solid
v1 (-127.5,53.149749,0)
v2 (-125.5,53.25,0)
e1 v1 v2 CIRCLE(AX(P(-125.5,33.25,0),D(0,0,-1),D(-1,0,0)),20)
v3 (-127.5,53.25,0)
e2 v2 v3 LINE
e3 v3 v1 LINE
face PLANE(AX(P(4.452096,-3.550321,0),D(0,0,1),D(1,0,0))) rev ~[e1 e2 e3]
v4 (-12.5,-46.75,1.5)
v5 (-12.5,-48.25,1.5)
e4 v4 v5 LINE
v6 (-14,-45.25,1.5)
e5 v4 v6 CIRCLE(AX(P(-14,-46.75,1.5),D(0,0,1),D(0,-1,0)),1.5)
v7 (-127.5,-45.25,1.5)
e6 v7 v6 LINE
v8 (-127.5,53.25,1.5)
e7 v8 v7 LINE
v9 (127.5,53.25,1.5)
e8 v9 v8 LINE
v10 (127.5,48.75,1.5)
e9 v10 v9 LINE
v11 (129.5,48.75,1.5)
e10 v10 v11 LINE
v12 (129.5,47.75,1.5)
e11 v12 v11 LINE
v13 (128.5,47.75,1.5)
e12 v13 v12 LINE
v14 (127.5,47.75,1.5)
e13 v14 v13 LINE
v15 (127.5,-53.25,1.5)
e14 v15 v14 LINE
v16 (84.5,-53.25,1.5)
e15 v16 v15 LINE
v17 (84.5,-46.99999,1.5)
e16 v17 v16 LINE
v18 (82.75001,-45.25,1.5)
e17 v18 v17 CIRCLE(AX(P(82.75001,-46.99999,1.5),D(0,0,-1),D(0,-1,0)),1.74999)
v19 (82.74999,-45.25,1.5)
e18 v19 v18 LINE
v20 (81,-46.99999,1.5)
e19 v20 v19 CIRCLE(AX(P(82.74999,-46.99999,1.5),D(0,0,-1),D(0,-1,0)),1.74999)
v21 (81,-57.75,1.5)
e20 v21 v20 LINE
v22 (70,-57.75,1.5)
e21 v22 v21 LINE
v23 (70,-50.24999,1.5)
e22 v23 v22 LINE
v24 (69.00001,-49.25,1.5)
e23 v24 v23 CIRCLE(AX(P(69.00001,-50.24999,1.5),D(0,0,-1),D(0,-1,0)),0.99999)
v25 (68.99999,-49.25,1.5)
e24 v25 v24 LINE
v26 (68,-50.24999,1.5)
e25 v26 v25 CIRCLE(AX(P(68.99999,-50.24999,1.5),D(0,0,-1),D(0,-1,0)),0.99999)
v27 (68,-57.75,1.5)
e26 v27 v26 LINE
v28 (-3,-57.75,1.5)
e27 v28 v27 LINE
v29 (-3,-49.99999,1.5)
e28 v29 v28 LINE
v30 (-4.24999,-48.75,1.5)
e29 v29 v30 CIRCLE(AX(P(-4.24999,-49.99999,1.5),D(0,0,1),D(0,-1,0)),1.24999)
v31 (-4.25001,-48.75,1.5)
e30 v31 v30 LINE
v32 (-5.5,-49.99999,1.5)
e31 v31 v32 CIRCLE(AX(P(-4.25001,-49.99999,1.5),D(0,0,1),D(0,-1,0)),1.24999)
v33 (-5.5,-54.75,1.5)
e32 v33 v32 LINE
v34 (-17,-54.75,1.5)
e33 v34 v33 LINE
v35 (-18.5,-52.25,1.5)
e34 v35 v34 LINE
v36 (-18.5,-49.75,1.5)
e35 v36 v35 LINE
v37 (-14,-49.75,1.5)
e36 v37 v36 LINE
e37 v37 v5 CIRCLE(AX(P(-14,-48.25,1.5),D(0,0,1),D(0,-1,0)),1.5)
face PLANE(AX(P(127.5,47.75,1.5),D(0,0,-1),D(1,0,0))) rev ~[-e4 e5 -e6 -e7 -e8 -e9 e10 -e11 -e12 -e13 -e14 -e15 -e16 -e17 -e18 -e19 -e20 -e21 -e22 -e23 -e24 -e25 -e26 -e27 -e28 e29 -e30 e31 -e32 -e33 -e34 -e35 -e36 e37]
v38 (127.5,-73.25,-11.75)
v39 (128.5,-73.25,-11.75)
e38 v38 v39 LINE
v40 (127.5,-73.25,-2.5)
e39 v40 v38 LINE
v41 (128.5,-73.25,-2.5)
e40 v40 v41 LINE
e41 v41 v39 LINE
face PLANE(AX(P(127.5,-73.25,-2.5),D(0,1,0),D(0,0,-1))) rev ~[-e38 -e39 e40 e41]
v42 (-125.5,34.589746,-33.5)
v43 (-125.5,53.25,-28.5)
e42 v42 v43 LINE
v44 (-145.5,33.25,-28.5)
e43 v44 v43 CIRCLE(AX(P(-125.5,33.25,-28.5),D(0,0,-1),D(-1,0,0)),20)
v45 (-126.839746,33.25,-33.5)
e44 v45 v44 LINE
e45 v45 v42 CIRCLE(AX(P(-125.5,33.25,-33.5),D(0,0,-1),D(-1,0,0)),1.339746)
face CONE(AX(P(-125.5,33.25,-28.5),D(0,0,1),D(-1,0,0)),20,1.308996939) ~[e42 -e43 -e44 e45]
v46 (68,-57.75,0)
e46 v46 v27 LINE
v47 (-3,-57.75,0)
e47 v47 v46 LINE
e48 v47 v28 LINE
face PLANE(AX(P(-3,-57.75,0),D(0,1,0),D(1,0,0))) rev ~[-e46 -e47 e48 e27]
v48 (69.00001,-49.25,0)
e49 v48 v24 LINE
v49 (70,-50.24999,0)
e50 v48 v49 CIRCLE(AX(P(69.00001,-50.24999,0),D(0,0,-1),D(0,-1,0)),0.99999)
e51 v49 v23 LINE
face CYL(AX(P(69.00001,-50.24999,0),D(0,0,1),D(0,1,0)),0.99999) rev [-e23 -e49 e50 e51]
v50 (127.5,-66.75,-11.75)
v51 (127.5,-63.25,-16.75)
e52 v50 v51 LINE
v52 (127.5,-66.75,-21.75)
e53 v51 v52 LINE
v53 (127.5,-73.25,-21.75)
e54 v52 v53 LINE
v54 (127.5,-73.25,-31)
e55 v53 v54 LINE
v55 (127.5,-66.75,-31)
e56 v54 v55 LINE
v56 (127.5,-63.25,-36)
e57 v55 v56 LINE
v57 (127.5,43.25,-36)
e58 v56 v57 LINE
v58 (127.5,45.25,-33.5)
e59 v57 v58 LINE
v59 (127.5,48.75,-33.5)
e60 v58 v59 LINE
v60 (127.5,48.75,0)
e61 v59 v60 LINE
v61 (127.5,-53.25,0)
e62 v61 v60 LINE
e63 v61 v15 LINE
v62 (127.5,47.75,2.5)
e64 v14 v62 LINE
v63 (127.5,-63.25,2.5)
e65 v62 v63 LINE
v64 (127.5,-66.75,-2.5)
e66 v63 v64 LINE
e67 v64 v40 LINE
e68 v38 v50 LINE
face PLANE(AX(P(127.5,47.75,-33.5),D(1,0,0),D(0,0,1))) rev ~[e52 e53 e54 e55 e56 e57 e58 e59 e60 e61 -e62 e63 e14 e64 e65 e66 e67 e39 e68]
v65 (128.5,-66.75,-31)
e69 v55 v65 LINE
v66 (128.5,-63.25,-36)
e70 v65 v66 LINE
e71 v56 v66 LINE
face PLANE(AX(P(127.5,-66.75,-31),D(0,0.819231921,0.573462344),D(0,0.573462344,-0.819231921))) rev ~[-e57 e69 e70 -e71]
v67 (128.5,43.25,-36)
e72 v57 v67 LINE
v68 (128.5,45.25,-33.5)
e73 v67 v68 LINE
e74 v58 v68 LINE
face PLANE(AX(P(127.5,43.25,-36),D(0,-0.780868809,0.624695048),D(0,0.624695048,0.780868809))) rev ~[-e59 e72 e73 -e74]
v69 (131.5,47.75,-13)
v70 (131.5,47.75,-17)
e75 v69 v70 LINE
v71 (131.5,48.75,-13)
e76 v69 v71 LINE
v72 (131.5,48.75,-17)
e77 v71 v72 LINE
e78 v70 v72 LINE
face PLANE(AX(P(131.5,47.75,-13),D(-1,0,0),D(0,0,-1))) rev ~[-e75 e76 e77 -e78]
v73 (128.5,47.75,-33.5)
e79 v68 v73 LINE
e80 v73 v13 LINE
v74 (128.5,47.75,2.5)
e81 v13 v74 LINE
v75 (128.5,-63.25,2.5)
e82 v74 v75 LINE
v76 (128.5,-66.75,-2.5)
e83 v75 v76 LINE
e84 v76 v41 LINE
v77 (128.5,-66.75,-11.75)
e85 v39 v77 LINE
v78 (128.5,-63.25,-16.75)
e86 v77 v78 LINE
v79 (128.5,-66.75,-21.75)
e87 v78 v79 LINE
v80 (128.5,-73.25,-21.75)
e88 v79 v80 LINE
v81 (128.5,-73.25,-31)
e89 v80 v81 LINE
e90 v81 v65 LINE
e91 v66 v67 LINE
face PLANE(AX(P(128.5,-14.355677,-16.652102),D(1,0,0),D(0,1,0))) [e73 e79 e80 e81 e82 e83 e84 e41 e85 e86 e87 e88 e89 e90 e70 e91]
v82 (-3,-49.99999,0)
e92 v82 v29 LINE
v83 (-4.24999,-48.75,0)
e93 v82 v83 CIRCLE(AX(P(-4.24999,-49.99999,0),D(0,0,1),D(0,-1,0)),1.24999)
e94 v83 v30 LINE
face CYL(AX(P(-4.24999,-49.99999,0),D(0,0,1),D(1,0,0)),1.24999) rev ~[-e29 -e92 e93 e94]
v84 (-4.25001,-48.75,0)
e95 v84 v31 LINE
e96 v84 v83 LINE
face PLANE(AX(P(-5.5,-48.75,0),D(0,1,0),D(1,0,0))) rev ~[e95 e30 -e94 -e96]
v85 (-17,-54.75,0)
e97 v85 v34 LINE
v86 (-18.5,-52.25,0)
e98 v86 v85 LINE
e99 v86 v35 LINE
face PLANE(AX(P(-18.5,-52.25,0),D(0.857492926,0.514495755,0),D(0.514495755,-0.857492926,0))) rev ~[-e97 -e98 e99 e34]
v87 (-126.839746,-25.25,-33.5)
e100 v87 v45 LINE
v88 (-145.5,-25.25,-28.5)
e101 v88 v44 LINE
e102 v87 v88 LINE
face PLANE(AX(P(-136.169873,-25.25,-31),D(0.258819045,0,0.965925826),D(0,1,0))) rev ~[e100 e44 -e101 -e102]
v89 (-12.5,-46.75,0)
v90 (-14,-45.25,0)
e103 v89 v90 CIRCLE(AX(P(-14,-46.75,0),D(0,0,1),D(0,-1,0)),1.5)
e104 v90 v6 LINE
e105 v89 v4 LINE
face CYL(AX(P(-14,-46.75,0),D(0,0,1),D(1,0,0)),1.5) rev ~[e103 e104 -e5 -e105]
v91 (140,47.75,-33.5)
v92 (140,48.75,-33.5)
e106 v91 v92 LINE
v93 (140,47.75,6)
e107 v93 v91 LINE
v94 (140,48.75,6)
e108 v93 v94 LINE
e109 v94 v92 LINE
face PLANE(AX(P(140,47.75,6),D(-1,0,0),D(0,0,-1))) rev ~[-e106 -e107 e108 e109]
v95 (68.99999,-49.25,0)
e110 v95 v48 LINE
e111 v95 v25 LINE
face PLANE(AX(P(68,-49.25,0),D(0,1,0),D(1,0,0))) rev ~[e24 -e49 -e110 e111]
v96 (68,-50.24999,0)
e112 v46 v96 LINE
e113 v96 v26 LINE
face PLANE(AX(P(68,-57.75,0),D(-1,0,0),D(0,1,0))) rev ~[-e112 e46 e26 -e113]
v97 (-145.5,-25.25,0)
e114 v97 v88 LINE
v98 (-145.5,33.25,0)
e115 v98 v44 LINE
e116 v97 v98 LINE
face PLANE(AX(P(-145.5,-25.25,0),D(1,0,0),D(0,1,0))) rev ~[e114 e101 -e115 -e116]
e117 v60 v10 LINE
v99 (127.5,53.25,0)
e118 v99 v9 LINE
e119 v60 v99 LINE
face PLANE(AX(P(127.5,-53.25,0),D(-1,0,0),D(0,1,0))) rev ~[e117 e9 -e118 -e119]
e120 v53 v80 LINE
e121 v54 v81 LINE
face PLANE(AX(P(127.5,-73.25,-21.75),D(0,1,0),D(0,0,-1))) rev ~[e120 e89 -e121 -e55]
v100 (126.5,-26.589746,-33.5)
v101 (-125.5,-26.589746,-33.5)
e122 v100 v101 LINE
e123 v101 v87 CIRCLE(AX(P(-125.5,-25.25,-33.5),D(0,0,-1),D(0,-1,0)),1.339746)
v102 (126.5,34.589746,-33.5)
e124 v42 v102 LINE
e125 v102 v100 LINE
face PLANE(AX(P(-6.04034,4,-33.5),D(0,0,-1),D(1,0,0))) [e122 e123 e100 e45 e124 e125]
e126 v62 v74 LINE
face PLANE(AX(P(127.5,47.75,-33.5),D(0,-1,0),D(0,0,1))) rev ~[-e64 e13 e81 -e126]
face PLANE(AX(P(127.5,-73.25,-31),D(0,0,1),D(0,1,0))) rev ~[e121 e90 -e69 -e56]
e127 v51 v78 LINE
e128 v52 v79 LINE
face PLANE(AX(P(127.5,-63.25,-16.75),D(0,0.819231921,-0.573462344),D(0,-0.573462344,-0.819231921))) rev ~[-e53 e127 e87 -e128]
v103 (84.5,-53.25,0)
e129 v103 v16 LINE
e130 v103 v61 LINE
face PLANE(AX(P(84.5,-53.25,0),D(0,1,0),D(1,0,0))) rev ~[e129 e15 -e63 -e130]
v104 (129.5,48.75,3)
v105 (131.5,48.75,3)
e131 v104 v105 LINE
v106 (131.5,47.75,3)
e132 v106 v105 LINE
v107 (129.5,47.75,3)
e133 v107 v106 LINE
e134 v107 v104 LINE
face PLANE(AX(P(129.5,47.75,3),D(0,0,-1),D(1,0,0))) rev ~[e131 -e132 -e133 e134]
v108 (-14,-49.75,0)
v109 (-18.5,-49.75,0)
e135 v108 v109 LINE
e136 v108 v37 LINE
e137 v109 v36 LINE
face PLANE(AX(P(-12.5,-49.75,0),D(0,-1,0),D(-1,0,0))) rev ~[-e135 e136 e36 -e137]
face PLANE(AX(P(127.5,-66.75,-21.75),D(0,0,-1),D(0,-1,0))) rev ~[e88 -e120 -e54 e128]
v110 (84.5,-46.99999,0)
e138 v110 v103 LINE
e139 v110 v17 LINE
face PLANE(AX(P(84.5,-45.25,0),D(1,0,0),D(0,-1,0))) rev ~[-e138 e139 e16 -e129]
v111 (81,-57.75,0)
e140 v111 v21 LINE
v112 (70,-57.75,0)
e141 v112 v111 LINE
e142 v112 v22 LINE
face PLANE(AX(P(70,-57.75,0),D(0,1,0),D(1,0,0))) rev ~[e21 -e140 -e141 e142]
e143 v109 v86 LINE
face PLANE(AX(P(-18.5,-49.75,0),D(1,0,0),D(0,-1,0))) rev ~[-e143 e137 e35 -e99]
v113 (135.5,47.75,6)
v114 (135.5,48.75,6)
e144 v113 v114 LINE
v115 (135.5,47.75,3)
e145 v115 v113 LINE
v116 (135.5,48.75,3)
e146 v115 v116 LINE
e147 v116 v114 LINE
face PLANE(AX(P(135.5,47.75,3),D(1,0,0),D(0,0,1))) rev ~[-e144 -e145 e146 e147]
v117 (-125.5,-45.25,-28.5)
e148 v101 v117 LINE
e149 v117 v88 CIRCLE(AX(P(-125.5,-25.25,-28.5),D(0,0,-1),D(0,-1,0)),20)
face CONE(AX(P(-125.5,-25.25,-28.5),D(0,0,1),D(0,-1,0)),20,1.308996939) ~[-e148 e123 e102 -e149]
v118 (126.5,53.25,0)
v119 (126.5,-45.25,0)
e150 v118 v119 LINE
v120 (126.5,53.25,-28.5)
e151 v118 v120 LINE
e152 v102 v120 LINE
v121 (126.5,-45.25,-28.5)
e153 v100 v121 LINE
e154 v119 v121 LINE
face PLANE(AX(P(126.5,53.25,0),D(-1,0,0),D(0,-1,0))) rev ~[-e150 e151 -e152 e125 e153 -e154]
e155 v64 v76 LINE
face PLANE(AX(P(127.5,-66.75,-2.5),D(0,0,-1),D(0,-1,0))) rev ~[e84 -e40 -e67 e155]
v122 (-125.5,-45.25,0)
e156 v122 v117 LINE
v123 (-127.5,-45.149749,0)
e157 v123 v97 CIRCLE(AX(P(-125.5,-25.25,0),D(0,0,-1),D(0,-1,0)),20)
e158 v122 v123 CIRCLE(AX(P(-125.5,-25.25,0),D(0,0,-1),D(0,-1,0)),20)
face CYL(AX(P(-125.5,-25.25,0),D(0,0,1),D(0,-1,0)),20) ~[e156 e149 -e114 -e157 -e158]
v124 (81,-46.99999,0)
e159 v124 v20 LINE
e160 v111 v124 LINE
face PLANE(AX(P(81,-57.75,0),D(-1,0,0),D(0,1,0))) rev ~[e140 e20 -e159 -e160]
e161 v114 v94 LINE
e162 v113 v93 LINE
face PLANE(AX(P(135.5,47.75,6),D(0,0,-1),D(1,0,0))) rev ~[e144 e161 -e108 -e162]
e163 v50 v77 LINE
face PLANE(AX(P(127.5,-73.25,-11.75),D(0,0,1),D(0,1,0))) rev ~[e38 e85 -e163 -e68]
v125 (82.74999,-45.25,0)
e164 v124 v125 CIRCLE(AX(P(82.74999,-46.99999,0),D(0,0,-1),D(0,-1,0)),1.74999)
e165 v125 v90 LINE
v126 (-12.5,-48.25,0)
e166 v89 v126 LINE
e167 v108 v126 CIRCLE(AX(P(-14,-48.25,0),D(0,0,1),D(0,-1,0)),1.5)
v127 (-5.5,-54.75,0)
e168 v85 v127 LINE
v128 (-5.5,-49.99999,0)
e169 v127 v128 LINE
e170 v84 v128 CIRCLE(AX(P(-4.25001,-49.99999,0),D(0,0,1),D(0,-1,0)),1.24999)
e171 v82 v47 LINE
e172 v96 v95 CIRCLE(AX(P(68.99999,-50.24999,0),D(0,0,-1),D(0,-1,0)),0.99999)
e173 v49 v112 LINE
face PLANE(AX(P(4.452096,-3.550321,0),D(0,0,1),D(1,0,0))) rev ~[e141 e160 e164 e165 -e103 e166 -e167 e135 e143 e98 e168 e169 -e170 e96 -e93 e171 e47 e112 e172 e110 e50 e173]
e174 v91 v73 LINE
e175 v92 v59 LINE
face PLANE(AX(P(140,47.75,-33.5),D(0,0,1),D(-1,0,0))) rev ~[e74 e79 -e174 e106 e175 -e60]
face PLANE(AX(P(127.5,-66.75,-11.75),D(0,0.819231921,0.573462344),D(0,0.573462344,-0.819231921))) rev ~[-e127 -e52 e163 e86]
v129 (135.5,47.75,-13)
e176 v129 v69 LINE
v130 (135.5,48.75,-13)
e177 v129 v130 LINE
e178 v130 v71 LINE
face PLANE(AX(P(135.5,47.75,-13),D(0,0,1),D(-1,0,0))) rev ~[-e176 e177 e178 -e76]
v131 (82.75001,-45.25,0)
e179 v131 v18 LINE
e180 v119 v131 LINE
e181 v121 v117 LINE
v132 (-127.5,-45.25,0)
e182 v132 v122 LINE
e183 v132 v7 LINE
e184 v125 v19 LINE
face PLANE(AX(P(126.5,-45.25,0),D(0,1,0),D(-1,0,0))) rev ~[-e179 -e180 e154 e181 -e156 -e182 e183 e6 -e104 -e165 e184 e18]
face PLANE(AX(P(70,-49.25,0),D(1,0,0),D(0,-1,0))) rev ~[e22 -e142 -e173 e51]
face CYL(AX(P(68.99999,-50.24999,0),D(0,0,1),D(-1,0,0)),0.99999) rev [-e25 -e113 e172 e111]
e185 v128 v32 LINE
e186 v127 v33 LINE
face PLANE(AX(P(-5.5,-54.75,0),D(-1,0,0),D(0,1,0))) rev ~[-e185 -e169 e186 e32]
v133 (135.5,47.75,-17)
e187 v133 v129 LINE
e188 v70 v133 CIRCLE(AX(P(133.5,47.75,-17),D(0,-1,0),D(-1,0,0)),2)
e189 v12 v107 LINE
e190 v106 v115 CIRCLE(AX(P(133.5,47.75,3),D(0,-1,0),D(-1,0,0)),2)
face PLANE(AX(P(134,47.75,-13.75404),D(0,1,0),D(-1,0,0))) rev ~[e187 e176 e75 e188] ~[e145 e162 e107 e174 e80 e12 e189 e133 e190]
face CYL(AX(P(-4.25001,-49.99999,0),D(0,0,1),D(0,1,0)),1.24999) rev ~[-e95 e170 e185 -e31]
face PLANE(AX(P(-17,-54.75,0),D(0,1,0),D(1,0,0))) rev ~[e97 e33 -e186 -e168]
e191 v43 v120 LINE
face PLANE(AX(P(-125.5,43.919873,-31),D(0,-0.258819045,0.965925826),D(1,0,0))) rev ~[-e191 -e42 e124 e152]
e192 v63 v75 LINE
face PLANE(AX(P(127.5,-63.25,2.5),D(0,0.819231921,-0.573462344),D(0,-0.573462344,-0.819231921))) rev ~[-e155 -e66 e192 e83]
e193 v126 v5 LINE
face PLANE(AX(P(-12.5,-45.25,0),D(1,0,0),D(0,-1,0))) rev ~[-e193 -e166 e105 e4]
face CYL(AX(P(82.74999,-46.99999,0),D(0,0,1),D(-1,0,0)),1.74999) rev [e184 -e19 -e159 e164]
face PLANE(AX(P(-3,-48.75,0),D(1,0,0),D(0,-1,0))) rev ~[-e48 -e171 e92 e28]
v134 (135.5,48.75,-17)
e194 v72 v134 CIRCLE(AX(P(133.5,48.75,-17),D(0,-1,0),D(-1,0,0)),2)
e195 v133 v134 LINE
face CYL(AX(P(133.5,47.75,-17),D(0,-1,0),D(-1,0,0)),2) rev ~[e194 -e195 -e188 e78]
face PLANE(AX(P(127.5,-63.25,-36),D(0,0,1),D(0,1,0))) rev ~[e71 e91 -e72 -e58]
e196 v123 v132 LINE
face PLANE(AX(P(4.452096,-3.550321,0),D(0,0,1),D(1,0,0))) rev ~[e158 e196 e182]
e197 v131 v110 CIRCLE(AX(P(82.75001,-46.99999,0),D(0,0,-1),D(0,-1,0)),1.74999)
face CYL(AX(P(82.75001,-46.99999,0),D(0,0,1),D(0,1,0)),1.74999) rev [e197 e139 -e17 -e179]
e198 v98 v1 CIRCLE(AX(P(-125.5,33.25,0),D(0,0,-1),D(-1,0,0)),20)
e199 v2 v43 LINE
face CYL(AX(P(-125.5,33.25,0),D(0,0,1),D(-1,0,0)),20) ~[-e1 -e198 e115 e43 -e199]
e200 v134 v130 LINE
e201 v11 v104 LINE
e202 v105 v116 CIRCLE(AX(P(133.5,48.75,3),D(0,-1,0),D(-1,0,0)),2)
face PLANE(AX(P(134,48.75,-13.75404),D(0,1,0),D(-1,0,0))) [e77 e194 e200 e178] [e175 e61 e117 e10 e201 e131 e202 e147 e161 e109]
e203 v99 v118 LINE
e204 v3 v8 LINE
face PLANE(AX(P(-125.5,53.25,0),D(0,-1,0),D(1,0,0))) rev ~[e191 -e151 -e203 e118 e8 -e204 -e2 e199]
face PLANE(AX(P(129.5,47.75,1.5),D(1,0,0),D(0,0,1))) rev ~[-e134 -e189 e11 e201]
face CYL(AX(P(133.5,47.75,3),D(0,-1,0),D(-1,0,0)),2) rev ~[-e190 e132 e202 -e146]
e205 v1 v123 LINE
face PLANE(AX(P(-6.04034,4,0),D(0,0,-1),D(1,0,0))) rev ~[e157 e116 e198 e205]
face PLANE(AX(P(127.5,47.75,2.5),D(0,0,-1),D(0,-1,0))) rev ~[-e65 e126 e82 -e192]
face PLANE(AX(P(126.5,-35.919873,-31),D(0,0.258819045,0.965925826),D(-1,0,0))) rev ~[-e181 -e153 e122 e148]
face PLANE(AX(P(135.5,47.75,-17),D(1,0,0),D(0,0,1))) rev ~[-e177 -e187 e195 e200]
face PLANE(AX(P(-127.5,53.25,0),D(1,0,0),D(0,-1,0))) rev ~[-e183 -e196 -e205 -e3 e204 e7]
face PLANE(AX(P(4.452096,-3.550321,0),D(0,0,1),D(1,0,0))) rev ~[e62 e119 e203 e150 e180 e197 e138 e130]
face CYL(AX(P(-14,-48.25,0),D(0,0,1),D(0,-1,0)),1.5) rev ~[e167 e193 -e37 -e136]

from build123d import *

# Parameters (mm, degrees)
F1_DEPTH  = 1.5
F3_DEPTH  = 1
F4_R      = 0.99999
F5_R      = 1.74999
F6_R      = 1.24999
F7_R      = 1.5
F9_DEPTH  = 1
F11_DEPTH = 33.5
F12_SIZE2 = 5
F12_SIZE  = 18.6602540378


# Not quite as in the source:
# - a fillet or chamfer is up to 0.001 mm smaller than in the source, because OpenCascade refuses the exact size


with BuildPart() as f1:
    # F0 (on Top) → F1 (new body)
    with BuildSketch(Plane.XY):
        Polygon((84.5, -53.25), (127.5, -53.25), (127.5, 53.25), (-127.5, 53.25), (-127.5, -45.25), (-12.5, -45.25), (-12.5, -49.75), (-18.5, -49.75), (-18.5, -52.25), (-17, -54.75), (-5.5, -54.75), (-5.5, -48.75), (-3, -48.75), (-3, -57.75), (68, -57.75), (68, -49.25), (70, -49.25), (70, -57.75), (81, -57.75), (81, -45.25), (84.5, -45.25), align=None)
    extrude(amount=F1_DEPTH)

    # F2 (on face) → F3 (join)
    with BuildSketch(Plane.YZ.offset(127.5)):
        Polygon((47.75, 2.5), (-63.25, 2.5), (-66.75, -2.5), (-73.25, -2.5), (-73.25, -11.75), (-66.75, -11.75), (-63.25, -16.75), (-66.75, -21.75), (-73.25, -21.75), (-73.25, -31), (-66.75, -31), (-63.25, -36), (43.25, -36), (45.25, -33.5), (47.75, -33.5), align=None)
    extrude(amount=F3_DEPTH)

    # F4 (radius 1 in the source; OpenCascade refuses exactly that, so slightly less here)
    f4_edges = [f1.edges().sort_by_distance(p)[0] for p in [
        (68, -49.25, 0.75),
        (70, -49.25, 0.75),
    ]]
    fillet(f4_edges, radius=F4_R)

    # F5 (radius 1.75 in the source; OpenCascade refuses exactly that, so slightly less here)
    f5_edges = [f1.edges().sort_by_distance(p)[0] for p in [
        (81, -45.25, 0.75),
        (84.5, -45.25, 0.75),
    ]]
    fillet(f5_edges, radius=F5_R)

    # F6 (radius 1.25 in the source; OpenCascade refuses exactly that, so slightly less here)
    f6_edges = [f1.edges().sort_by_distance(p)[0] for p in [
        (-5.5, -48.75, 0.75),
        (-3, -48.75, 0.75),
    ]]
    fillet(f6_edges, radius=F6_R)

    # F7
    f7_edges = [f1.edges().sort_by_distance(p)[0] for p in [
        (-12.5, -49.75, 0.75),
        (-12.5, -45.25, 0.75),
    ]]
    fillet(f7_edges, radius=F7_R)

    # F8 (on face) → F9 (join)
    with BuildSketch(Plane(origin=(0, 47.75, 0), x_dir=(-1, 0, 0), z_dir=(0, 1, 0))):
        with BuildLine():
            Line((-140, -33.5), (-127.5, -33.5))
            Line((-127.5, -33.5), (-127.5, 1.5))
            Line((-127.5, 1.5), (-129.5, 1.5))
            Line((-129.5, 1.5), (-129.5, 3))
            Line((-129.5, 3), (-131.5, 3))
            ThreePointArc((-131.5, 3), (-133.5, 1), (-135.5, 3))
            Line((-135.5, 3), (-135.5, 6))
            Line((-135.5, 6), (-140, 6))
            Line((-140, 6), (-140, -33.5))
        make_face()
        with BuildLine():
            Line((-135.5, -17), (-135.5, -13))
            Line((-135.5, -13), (-131.5, -13))
            Line((-131.5, -13), (-131.5, -17))
            ThreePointArc((-131.5, -17), (-133.5, -19), (-135.5, -17))
        make_face(mode=Mode.SUBTRACT)
    extrude(amount=F9_DEPTH)

    # F10 (on face) → F11 (join, through all)
    with BuildSketch(Plane(origin=(0, 0, 0), x_dir=(1, 0, 0), z_dir=(0, 0, -1))):
        with BuildLine():
            Line((126.5, -53.25), (126.5, 45.25))
            Line((126.5, 45.25), (-125.5, 45.25))
            ThreePointArc((-125.5, 45.25), (-139.6421356237, 39.3921356237), (-145.5, 25.25))
            Line((-145.5, 25.25), (-145.5, -33.25))
            ThreePointArc((-145.5, -33.25), (-139.6421356237, -47.3921356237), (-125.5, -53.25))
            Line((-125.5, -53.25), (126.5, -53.25))
        make_face()
    extrude(amount=F11_DEPTH)

    # F12
    f12_edges = [f1.edges().sort_by_distance(p)[0] for p in [
        (0.5, -45.25, -33.5),
        (0.5, 53.25, -33.5),
    ]]
    f12_side = f1.faces().sort_by_distance((-8.651711, 4, -33.5))[0]
    chamfer(f12_edges, length=F12_SIZE, length2=F12_SIZE2, reference=f12_side)


solid = f1.part
